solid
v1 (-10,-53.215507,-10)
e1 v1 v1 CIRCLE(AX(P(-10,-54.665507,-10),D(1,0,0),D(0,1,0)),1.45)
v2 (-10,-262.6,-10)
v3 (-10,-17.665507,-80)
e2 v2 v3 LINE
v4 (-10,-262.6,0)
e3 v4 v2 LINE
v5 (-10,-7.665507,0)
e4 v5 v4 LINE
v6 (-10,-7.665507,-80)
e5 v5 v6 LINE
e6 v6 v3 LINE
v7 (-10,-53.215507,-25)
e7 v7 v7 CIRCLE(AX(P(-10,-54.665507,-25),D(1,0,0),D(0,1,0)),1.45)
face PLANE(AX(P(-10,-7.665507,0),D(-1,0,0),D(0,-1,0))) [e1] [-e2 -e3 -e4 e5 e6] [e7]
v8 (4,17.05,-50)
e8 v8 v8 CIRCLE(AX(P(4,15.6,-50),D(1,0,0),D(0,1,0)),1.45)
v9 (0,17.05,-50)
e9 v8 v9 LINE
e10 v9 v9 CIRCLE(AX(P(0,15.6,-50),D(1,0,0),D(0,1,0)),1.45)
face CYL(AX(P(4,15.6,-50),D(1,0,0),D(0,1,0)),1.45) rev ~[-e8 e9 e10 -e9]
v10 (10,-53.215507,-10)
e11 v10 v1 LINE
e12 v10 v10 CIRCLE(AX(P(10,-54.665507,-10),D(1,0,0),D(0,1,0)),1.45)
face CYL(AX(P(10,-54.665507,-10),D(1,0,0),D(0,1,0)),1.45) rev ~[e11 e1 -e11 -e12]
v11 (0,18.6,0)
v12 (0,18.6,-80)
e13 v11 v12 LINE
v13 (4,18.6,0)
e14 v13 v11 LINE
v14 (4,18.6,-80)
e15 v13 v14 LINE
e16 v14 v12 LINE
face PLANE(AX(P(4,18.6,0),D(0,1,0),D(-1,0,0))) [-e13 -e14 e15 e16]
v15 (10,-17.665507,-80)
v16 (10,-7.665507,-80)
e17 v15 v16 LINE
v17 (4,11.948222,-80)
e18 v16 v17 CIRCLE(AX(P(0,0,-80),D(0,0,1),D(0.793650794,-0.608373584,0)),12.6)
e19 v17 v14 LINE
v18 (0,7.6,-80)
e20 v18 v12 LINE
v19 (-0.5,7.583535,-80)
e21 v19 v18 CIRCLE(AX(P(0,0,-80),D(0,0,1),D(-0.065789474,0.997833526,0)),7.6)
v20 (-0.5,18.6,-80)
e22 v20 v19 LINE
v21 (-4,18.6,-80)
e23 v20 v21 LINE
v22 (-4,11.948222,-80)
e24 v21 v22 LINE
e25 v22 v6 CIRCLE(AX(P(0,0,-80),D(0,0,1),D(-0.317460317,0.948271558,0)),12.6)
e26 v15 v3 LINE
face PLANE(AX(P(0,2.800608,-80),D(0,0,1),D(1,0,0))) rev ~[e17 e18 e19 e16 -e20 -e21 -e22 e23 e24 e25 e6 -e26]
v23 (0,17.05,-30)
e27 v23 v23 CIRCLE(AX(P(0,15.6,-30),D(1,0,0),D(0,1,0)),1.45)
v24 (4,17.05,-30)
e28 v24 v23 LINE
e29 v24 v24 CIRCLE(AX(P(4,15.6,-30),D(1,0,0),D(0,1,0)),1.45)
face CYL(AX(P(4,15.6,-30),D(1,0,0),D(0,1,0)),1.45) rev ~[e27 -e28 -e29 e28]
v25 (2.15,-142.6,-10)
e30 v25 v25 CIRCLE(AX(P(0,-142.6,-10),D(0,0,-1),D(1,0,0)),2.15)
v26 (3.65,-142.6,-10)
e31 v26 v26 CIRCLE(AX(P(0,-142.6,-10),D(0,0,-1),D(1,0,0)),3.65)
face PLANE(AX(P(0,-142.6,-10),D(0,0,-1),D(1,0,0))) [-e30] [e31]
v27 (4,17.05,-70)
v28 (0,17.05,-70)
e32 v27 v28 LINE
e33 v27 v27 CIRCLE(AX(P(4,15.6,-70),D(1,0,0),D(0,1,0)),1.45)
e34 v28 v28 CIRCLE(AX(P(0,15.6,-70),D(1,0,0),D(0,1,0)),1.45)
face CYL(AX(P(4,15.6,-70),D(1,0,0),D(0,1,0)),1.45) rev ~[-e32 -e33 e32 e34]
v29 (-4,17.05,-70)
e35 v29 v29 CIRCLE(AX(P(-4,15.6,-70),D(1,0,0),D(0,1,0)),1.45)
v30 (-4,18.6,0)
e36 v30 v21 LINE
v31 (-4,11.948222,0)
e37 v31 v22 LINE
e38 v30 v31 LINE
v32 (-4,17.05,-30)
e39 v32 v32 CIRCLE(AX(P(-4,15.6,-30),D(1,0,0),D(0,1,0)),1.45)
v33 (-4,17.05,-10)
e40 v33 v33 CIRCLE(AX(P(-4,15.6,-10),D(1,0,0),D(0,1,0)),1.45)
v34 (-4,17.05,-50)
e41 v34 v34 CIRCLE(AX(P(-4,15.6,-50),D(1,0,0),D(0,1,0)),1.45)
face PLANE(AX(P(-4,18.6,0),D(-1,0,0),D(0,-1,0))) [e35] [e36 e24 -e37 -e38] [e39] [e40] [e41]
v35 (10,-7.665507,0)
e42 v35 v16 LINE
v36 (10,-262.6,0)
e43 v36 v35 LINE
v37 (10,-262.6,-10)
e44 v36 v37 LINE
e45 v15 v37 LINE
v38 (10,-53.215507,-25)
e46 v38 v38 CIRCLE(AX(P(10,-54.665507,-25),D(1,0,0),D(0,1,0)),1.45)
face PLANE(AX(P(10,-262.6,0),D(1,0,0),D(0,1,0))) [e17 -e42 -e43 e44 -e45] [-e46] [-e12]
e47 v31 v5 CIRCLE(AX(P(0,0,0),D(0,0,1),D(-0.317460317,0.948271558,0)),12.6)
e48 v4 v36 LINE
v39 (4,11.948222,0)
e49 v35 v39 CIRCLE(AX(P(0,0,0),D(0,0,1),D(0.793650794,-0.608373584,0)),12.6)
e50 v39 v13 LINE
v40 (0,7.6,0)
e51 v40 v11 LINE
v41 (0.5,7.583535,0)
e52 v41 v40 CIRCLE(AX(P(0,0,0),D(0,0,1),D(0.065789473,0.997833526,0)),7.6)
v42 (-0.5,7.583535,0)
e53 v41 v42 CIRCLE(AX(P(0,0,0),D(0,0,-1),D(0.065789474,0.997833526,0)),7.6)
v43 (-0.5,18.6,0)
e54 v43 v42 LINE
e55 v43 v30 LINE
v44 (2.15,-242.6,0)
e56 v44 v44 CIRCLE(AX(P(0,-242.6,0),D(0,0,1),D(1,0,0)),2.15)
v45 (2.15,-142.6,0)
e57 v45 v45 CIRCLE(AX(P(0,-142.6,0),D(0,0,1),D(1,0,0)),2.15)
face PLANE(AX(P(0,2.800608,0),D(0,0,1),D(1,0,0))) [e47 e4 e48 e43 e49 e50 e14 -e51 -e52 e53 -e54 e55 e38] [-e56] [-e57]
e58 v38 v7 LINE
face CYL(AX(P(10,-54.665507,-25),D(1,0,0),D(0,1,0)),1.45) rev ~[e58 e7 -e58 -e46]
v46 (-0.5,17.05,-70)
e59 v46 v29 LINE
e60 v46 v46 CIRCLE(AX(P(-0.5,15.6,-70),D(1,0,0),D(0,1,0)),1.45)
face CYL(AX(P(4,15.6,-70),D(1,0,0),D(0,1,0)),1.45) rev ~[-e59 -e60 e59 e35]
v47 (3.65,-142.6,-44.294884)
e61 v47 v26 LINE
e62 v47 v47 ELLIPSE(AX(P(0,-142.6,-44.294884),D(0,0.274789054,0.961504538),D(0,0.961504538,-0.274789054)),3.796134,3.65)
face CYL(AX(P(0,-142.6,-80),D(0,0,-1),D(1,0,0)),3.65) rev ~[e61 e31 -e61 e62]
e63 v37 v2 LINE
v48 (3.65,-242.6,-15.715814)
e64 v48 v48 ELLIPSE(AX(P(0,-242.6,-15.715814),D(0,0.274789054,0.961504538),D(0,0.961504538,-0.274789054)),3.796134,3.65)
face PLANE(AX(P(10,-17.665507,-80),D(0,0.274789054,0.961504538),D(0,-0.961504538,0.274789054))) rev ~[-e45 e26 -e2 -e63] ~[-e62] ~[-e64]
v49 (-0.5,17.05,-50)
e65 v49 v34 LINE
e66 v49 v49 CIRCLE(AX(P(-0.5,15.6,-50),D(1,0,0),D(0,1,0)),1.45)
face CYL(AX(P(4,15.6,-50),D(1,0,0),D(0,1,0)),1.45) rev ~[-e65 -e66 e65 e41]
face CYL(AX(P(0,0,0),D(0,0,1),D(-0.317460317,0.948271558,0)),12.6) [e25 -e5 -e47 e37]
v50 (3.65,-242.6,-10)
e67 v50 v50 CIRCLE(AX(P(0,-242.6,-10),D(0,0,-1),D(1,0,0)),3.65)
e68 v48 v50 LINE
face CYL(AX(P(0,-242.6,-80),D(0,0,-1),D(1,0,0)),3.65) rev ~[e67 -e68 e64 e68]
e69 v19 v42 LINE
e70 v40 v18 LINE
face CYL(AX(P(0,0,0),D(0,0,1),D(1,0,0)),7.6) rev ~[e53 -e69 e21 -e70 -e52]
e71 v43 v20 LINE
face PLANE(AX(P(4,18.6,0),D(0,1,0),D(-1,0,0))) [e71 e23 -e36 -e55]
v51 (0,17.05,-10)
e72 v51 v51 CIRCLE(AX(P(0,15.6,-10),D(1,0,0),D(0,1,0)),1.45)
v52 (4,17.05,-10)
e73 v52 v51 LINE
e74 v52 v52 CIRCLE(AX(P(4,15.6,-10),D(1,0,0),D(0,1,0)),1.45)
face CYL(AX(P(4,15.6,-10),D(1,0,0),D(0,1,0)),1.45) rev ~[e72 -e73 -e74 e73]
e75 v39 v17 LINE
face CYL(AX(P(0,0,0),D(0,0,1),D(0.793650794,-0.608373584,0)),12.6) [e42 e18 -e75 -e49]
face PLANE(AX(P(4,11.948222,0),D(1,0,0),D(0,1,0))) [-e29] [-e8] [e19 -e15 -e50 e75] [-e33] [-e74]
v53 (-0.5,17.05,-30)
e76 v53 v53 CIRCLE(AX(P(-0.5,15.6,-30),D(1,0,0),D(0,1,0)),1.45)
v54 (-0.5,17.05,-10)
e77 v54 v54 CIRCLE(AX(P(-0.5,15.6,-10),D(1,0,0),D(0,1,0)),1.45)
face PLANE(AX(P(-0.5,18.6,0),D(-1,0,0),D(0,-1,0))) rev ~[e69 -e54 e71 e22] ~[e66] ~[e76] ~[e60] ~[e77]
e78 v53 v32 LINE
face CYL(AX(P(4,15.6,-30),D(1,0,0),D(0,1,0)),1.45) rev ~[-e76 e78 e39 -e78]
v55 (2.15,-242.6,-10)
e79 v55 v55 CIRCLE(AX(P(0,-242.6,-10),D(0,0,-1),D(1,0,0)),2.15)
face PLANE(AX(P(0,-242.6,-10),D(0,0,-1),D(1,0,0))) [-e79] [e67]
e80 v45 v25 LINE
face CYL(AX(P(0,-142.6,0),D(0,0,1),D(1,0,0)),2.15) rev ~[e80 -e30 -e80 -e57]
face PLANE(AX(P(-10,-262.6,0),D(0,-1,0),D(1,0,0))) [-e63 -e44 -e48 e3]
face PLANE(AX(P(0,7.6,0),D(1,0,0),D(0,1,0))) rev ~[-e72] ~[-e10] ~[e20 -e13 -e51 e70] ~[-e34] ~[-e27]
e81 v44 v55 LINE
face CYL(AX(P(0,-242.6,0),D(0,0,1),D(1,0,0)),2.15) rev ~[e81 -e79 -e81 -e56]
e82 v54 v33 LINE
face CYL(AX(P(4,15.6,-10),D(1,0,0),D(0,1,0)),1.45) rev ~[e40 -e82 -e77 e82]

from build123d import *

# Parameters (mm, degrees)
F1_DEPTH  = 80
F0_R      = 7.6
F2_DEPTH  = 80
F3_R      = 2.15
F4_DEPTH  = 80.001
F5_R      = 3.65
F5_R_2    = 2.15
F6_DEPTH  = 70
F8_DEPTH  = 22.601
F10_DEPTH = 80.001
F11_R     = 1.45
F12_DEPTH = 16.601
F13_R     = 1.45
F14_DEPTH = 22.601


with BuildPart() as f1:
    # F0 (on Top) → F1 (new body)
    with BuildSketch(Plane.XY):
        with BuildLine():
            ThreePointArc((10, -7.6655071587), (0, -12.6), (-10, -7.6655071587))
            Line((-10, -7.6655071587), (-10, -262.6))
            Line((-10, -262.6), (10, -262.6))
            Line((10, -262.6), (10, -7.6655071587))
        make_face()
    extrude(amount=-F1_DEPTH)

    # F0 (on Top) → F2 (join)
    with BuildSketch(Plane.XY):
        with BuildLine():
            Line((-4, 18.6), (-4, 11.948221625))
            ThreePointArc((-4, 11.948221625), (-12.0488418199, 3.685839226), (-10, -7.6655071587))
            ThreePointArc((-10, -7.6655071587), (0, -12.6), (10, -7.6655071587))
            ThreePointArc((10, -7.6655071587), (12.0488418199, 3.685839226), (4, 11.948221625))
            Line((4, 11.948221625), (4, 18.6))
            Line((4, 18.6), (-4, 18.6))
        make_face()
        Circle(F0_R, mode=Mode.SUBTRACT)
    extrude(amount=-F2_DEPTH)

    # F3 (on face) → F4 (cut, through all)
    with BuildSketch(Plane.XY):
        with Locations((0, -142.6)):
            Circle(F3_R)
        with Locations((0, -242.6)):
            Circle(F3_R)
    extrude(amount=-F4_DEPTH, mode=Mode.SUBTRACT)

    # F5 (on face) → F6 (cut)
    with BuildSketch(Plane(origin=(0, 0, -80), x_dir=(1, 0, 0), z_dir=(0, 0, -1))):
        with Locations((0, 242.6)):
            Circle(F5_R)
        with Locations((0, 242.6)):
            Circle(F5_R_2, mode=Mode.SUBTRACT)
        with Locations((0, 142.6)):
            Circle(F5_R)
        with Locations((0, 142.6)):
            Circle(F5_R_2, mode=Mode.SUBTRACT)
    extrude(amount=-F6_DEPTH, mode=Mode.SUBTRACT)

    # F7 (on face) → F8 (cut, through all)
    with BuildSketch(Plane.YZ.offset(10)):
        Polygon((-262.6, -80), (-17.6655071587, -80), (-262.6, -10), align=None)
    extrude(amount=-F8_DEPTH, mode=Mode.SUBTRACT)

    # F9 (on face) → F10 (cut, through all)
    with BuildSketch(Plane.XY):
        with BuildLine():
            Line((0, 7.6), (0, 18.6))
            Line((0, 18.6), (-0.5, 18.6))
            Line((-0.5, 18.6), (-0.5, 7.5835347959))
            ThreePointArc((-0.5, 7.5835347959), (-0.2501355147, 7.5958825836), (0, 7.6))
        make_face()
        with BuildLine():
            ThreePointArc((0.5, 7.5835347959), (0.2501355147, 7.5958825836), (0, 7.6))
            Line((0, 7.6), (0, 0))
            Line((0, 0), (0.5, 0))
            Line((0.5, 0), (0.5, 7.5835347959))
        make_face()
        with BuildLine():
            Line((0, 0), (0, 7.6))
            ThreePointArc((0, 7.6), (-0.2501355147, 7.5958825836), (-0.5, 7.5835347959))
            Line((-0.5, 7.5835347959), (-0.5, 0))
            Line((-0.5, 0), (0, 0))
        make_face()
    extrude(amount=-F10_DEPTH, mode=Mode.SUBTRACT)

    # F11 (on face) → F12 (cut, through all)
    with BuildSketch(Plane.YZ.offset(4)):
        with Locations((15.6, -30)):
            Circle(F11_R)
        with Locations((15.6, -70)):
            Circle(F11_R)
        with Locations((15.6, -50)):
            Circle(F11_R)
        with Locations((15.6, -10)):
            Circle(F11_R)
    extrude(amount=-F12_DEPTH, mode=Mode.SUBTRACT)

    # F13 (on face) → F14 (cut, through all)
    with BuildSketch(Plane.YZ.offset(10)):
        with Locations((-54.6655071587, -10)):
            Circle(F13_R)
        with Locations((-54.6655071587, -25)):
            Circle(F13_R)
    extrude(amount=-F14_DEPTH, mode=Mode.SUBTRACT)


solid = f1.part
